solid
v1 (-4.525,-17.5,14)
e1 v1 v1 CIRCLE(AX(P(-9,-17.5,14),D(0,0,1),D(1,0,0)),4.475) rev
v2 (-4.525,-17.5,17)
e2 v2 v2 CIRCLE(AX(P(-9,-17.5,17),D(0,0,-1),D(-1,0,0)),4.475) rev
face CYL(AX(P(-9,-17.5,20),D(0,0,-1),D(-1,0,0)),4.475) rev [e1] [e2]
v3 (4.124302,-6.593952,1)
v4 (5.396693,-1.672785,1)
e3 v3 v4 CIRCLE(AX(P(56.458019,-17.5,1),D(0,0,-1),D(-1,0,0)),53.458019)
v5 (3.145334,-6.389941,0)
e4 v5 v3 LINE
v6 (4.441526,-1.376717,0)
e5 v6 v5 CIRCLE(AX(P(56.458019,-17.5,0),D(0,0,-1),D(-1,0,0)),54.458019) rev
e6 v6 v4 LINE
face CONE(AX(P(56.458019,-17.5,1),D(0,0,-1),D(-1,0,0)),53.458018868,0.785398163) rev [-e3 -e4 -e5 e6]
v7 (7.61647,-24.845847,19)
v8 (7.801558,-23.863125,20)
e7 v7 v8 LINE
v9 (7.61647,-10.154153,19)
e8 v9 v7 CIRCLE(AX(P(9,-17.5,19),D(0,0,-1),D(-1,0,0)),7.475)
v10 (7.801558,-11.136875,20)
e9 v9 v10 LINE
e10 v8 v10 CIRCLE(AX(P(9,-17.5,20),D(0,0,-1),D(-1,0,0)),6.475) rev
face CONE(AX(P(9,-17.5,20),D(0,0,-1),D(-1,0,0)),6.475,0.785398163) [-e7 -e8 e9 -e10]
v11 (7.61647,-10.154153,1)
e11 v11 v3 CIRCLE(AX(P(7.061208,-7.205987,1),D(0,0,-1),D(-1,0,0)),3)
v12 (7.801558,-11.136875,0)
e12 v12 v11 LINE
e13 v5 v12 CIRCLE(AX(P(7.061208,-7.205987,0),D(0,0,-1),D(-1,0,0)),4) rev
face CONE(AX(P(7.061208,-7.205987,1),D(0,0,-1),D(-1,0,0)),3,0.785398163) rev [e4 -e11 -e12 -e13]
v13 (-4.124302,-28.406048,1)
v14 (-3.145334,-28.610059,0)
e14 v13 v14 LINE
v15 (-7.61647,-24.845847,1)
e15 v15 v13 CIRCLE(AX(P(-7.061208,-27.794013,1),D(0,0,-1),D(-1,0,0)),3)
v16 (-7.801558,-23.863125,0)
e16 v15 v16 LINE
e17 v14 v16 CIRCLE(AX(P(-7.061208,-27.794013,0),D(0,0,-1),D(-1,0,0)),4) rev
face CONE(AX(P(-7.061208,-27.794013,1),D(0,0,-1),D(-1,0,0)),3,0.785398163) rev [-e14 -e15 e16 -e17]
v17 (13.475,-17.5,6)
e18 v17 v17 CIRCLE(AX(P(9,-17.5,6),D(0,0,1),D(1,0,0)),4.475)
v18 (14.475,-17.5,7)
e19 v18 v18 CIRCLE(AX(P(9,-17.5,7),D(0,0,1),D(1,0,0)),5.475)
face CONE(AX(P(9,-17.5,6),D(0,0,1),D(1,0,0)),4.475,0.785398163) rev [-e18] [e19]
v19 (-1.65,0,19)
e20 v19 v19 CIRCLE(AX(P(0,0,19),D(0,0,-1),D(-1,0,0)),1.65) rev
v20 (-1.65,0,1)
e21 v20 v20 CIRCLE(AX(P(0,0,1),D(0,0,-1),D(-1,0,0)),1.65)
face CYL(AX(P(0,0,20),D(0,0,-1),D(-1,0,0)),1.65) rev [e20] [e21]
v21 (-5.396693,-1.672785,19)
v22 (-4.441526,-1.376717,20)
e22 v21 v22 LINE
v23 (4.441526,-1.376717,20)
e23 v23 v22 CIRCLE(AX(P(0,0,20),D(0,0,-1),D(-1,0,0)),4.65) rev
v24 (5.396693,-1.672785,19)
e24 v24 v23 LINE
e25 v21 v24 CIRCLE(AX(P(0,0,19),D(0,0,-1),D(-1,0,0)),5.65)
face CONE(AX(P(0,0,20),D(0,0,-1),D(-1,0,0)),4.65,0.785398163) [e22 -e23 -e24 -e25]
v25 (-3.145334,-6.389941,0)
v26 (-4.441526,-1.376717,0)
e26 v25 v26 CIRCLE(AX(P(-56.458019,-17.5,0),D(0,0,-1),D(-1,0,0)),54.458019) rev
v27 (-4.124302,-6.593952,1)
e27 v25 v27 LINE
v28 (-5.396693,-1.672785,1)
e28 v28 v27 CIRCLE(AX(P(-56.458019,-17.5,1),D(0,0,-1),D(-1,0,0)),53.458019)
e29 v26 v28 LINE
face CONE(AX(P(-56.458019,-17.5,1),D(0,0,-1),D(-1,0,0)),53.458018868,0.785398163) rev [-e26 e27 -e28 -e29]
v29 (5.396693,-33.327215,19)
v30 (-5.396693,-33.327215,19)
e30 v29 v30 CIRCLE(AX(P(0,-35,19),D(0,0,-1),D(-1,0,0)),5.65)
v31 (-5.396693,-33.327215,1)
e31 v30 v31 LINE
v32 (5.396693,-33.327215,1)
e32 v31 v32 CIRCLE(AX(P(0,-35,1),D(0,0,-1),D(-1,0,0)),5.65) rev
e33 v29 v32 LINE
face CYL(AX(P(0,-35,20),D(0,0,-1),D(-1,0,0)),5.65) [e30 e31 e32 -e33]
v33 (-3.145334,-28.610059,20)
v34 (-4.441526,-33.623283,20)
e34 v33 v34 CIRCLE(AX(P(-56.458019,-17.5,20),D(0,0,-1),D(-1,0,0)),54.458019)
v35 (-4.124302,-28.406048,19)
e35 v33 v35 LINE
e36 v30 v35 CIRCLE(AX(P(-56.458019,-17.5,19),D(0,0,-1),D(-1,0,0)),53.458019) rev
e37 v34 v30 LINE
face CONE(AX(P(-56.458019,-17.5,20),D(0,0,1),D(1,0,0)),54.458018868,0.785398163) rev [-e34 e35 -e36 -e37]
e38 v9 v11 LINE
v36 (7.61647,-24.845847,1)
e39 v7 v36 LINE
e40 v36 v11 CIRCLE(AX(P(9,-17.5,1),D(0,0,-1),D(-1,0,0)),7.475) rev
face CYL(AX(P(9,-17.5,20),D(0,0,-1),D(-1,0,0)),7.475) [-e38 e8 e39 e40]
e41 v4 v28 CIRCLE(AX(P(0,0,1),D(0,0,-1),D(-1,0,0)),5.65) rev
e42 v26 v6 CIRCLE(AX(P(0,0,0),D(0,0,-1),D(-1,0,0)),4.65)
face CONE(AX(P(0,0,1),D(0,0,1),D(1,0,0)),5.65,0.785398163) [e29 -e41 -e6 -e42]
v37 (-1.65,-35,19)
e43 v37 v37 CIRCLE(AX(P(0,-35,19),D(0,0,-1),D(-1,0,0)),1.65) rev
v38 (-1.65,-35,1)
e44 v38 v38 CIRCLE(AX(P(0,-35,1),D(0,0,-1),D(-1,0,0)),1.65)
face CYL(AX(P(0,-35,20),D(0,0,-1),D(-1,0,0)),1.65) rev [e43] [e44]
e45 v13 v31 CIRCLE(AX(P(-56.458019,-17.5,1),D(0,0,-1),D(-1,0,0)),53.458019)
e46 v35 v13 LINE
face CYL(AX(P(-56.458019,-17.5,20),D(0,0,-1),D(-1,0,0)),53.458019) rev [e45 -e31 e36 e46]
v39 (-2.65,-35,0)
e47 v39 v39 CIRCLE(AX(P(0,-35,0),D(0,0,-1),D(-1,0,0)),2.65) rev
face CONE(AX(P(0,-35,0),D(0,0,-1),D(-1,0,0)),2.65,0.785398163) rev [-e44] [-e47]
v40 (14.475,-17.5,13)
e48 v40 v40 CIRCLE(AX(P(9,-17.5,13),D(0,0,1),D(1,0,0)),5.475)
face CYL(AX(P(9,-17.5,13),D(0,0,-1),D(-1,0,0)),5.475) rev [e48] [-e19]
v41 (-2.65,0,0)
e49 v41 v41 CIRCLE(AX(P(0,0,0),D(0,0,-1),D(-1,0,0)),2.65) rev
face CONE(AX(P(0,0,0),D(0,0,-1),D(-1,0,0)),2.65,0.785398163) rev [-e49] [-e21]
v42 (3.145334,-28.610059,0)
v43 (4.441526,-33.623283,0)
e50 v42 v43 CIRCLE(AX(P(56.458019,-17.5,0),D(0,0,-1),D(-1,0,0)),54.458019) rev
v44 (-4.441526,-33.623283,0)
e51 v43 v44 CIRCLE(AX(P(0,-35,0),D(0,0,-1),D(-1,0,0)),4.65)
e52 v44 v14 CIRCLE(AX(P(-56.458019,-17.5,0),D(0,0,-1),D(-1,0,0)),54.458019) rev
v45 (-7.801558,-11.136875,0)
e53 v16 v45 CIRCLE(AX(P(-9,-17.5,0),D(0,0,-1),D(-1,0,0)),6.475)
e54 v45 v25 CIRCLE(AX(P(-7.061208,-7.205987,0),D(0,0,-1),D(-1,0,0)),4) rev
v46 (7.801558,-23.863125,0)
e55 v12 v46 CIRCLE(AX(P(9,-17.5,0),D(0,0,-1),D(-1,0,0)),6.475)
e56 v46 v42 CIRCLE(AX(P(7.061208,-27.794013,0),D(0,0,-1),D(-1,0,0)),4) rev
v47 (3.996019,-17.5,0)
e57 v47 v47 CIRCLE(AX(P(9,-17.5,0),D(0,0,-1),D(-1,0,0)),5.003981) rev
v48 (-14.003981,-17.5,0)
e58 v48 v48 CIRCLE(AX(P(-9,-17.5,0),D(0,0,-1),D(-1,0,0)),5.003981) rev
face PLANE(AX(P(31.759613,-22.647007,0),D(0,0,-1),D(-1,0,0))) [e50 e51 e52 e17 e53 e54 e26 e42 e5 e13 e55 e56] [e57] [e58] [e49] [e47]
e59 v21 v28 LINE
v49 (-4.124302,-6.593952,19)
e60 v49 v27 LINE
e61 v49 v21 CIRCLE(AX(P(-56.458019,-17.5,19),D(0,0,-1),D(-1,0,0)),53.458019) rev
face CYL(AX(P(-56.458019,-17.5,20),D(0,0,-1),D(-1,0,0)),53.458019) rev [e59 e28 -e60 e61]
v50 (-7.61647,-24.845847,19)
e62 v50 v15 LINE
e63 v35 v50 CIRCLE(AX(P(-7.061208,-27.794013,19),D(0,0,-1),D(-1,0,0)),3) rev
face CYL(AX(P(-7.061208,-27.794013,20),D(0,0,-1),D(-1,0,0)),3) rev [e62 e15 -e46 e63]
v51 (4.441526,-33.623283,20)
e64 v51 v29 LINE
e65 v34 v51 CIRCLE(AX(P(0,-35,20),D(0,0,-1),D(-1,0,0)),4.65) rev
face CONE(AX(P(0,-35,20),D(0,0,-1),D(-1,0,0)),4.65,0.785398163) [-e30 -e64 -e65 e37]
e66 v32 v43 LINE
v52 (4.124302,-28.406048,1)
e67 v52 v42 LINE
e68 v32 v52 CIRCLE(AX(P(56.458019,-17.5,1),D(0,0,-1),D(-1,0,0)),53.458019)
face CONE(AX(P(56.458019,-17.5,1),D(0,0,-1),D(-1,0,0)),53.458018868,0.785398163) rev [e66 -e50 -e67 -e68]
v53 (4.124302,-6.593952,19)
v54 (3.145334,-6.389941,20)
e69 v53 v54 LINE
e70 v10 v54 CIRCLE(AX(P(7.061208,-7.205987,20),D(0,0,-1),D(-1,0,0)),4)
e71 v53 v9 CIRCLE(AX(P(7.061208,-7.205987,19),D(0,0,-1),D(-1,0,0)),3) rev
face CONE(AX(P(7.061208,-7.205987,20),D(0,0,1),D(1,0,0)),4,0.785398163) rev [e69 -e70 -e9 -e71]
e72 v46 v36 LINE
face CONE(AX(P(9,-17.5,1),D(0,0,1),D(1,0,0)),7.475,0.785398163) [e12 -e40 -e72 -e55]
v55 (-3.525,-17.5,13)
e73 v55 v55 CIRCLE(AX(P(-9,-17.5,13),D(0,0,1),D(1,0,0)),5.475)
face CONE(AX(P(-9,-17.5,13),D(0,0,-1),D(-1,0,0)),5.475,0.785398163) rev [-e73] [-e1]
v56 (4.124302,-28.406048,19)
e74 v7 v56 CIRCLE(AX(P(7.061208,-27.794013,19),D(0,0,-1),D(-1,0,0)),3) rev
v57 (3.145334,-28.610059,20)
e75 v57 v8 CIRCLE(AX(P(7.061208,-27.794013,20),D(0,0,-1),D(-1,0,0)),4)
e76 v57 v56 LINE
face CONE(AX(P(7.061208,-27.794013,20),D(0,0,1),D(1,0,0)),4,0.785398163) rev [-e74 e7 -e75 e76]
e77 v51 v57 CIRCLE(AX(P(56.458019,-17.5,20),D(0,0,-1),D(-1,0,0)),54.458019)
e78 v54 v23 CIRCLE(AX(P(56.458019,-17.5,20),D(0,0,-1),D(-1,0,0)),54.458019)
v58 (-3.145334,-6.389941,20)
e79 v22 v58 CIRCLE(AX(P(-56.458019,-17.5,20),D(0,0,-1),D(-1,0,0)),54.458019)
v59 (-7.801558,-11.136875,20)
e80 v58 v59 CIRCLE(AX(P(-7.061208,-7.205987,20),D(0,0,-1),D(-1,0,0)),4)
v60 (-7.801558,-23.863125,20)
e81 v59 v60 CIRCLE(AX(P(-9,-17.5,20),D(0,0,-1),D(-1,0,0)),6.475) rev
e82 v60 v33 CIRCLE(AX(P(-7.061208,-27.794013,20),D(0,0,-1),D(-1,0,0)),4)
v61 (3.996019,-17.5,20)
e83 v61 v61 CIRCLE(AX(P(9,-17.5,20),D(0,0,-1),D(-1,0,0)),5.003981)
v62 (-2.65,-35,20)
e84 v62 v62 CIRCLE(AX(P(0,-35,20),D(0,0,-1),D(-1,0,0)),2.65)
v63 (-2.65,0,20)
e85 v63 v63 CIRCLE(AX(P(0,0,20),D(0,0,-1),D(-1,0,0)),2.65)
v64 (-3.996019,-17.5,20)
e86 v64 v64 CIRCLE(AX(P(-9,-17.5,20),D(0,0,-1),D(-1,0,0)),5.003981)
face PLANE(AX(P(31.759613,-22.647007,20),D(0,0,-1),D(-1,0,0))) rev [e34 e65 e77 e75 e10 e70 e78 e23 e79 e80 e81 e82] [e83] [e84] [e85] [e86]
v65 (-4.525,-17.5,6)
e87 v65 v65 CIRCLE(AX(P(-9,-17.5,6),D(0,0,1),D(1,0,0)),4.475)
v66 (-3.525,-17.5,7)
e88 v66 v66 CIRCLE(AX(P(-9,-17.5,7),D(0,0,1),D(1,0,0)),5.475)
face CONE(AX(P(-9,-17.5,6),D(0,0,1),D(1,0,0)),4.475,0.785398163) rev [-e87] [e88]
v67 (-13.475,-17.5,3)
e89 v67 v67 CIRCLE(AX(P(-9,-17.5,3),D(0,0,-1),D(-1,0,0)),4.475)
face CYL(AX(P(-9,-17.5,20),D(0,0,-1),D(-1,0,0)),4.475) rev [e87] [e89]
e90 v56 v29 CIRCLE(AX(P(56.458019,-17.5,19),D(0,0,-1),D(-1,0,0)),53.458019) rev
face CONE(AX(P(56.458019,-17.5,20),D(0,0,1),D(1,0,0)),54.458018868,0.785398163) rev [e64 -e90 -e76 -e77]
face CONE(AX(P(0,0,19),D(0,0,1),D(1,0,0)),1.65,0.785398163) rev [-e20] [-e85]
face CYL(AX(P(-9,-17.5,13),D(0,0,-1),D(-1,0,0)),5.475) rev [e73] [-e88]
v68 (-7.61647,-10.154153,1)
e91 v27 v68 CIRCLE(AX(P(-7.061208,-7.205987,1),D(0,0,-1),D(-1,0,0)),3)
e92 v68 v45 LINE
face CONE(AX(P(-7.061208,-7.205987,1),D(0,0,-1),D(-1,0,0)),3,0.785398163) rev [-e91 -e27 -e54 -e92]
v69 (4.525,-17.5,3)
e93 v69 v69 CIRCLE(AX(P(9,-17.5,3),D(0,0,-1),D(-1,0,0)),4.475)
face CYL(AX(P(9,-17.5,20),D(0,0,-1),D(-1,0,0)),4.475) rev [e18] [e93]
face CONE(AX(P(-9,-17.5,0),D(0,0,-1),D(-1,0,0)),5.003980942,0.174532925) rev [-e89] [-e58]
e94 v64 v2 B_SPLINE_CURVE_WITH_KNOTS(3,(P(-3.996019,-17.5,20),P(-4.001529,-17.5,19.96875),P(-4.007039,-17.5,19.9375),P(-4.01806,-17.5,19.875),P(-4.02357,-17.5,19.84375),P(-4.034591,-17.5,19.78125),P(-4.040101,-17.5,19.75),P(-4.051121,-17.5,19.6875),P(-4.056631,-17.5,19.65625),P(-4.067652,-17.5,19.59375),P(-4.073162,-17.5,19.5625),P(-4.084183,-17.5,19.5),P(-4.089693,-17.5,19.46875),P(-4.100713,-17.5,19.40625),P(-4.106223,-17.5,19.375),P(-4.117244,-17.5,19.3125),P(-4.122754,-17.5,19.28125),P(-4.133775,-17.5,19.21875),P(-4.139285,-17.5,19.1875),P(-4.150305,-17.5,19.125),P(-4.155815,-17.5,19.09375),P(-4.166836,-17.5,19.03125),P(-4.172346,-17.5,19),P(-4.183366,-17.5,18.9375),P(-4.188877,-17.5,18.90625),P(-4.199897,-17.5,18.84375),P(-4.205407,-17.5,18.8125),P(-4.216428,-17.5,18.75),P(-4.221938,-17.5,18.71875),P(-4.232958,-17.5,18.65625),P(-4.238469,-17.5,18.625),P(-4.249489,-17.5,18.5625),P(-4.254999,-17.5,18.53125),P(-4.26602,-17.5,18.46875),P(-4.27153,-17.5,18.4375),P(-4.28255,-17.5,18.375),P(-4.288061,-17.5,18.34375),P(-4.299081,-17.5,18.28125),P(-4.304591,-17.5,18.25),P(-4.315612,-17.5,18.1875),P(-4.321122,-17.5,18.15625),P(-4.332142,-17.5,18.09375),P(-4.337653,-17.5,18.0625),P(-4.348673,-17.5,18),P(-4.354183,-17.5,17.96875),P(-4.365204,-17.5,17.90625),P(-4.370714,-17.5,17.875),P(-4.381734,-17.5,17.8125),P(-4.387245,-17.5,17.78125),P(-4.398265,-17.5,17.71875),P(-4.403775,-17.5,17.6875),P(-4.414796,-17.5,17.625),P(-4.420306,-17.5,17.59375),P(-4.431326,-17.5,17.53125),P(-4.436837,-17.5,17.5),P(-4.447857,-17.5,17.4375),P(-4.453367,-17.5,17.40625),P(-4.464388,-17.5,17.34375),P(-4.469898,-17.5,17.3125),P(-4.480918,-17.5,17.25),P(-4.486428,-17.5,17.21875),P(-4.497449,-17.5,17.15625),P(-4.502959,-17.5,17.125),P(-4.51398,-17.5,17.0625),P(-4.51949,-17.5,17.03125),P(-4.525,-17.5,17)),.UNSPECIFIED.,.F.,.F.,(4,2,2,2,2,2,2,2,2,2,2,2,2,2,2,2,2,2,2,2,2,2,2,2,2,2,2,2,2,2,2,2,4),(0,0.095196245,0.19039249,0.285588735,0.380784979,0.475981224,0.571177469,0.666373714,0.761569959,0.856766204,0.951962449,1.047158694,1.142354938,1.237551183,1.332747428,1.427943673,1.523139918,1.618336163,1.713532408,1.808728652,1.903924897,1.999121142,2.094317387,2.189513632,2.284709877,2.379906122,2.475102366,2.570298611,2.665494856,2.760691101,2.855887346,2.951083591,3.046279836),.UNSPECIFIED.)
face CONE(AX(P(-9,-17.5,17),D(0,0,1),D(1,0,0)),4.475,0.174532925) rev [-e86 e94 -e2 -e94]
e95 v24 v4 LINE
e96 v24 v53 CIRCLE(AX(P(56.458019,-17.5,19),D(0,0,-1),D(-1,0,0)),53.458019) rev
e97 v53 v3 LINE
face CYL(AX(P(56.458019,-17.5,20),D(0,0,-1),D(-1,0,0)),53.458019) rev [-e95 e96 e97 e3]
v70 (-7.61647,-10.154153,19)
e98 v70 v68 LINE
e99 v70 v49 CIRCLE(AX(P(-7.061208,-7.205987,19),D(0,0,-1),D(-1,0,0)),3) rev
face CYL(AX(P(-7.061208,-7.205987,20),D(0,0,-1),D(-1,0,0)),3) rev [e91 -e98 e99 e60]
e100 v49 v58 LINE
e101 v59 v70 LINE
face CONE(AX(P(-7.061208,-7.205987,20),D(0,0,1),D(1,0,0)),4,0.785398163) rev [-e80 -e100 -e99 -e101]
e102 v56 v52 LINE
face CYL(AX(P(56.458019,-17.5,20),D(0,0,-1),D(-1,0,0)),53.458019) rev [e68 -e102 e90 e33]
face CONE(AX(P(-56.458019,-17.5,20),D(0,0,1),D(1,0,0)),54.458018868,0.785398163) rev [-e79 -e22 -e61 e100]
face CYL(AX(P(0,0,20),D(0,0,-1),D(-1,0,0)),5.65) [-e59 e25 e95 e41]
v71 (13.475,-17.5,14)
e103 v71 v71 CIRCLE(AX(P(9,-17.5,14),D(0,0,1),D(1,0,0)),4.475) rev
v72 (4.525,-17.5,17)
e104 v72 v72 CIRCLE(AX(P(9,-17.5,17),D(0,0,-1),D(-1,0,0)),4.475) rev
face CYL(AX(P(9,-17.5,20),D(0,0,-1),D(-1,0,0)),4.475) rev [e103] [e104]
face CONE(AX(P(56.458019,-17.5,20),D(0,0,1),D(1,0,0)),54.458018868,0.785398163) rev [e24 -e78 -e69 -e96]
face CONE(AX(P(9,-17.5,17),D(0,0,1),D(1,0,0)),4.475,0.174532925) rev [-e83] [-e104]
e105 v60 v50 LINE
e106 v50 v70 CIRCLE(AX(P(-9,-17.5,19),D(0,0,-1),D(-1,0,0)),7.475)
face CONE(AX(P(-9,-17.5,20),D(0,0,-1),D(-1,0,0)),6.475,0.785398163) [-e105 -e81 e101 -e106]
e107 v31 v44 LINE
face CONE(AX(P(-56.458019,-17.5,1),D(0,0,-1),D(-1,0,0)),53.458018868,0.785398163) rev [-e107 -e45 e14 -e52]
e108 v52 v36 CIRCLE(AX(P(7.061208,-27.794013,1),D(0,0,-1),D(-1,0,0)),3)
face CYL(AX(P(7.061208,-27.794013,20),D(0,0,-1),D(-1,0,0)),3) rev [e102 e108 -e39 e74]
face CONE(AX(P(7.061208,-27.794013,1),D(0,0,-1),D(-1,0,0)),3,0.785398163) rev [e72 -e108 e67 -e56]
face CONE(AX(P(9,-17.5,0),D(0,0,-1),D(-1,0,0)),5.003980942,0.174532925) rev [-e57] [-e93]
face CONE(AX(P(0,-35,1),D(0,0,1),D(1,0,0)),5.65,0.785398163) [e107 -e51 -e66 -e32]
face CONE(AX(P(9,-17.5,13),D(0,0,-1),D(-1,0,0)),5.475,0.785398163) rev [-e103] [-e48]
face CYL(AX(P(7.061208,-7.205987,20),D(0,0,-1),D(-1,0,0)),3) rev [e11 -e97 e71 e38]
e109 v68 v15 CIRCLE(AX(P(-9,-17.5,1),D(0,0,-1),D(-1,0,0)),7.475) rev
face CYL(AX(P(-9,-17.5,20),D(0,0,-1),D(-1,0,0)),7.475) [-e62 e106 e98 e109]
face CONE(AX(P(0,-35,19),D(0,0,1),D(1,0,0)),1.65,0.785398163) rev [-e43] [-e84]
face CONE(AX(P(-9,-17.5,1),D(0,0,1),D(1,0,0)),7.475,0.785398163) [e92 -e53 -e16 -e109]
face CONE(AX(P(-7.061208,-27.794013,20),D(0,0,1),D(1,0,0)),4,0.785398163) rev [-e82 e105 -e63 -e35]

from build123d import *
from OCP.BRepFilletAPI import BRepFilletAPI_MakeChamfer

# Parameters (mm, degrees)
SKETCH1_R               = 1.65
SKETCH1_R_2             = 4.475
BOSS_EXTRUDE1_DEPTH     = 20
CHAMFER1_SIZE           = 1
CHAMFER2_SIZE           = 3
CHAMFER2_SIZE2          = 0.528980942
CUT_EXTRUDE1_DEPTH      = 3
CUT_EXTRUDE1_DEPTH_BACK = 3
SKETCH5_R               = 5.475
CHAMFER3_SIZE           = 1


with BuildPart() as part:
    # Sketch1 → Boss-Extrude1 (new body)
    with BuildSketch(Plane.XY):
        with BuildLine():
            ThreePointArc((5.396692576, -1.672784876), (0, 5.65), (-5.396692576, -1.672784876))
            ThreePointArc((-5.396692576, -1.672784876), (-4.701973782, -4.118237099), (-4.124302136, -6.593952399))
            ThreePointArc((-4.124302136, -6.593952399), (-4.919523181, -9.306745557), (-7.616470373, -10.154152821))
            ThreePointArc((-7.616470373, -10.154152821), (-16.475, -17.5), (-7.616470373, -24.845847179))
            ThreePointArc((-7.616470373, -24.845847179), (-4.919523181, -25.693254443), (-4.124302136, -28.406047601))
            ThreePointArc((-4.124302136, -28.406047601), (-4.701973782, -30.881762901), (-5.396692576, -33.327215124))
            ThreePointArc((-5.396692576, -33.327215124), (0, -40.65), (5.396692576, -33.327215124))
            ThreePointArc((5.396692576, -33.327215124), (4.701973782, -30.881762901), (4.124302136, -28.406047601))
            ThreePointArc((4.124302136, -28.406047601), (4.919523181, -25.693254443), (7.616470373, -24.845847179))
            ThreePointArc((7.616470373, -24.845847179), (16.475, -17.5), (7.616470373, -10.154152821))
            ThreePointArc((7.616470373, -10.154152821), (4.919523181, -9.306745557), (4.124302136, -6.593952399))
            ThreePointArc((4.124302136, -6.593952399), (4.701973782, -4.118237099), (5.396692576, -1.672784876))
        make_face()
        Circle(SKETCH1_R, mode=Mode.SUBTRACT)
        with Locations((0, -35)):
            Circle(SKETCH1_R, mode=Mode.SUBTRACT)
        with Locations((9, -17.5)):
            Circle(SKETCH1_R_2, mode=Mode.SUBTRACT)
        with Locations((-9, -17.5)):
            Circle(SKETCH1_R_2, mode=Mode.SUBTRACT)
    extrude(amount=BOSS_EXTRUDE1_DEPTH)

    # Chamfer1
    chamfer1_edges = [part.edges().sort_by_distance(p)[0] for p in [
        (0, -40.65, 0),
        (-4.701973782, -30.881762901, 0),
        (16.475, -17.5, 20),
        (-4.919523181, -25.693254443, 0),
        (-16.475, -17.5, 0),
        (-4.919523181, -9.306745557, 0),
        (-4.701973782, -4.118237099, 0),
        (0, 5.65, 0),
        (4.701973782, -4.118237099, 0),
        (4.919523181, -9.306745557, 0),
        (16.475, -17.5, 0),
        (4.919523181, -25.693254443, 0),
        (4.701973782, -30.881762901, 0),
        (4.919523181, -9.306745557, 20),
        (4.701973782, -4.118237099, 20),
        (0, 5.65, 20),
        (-4.701973782, -4.118237099, 20),
        (-1.65, 0, 0),
        (-1.65, 0, 20),
        (-4.919523181, -9.306745557, 20),
        (-1.65, -35, 0),
        (-1.65, -35, 20),
        (-16.475, -17.5, 20),
        (-4.919523181, -25.693254443, 20),
        (-4.701973782, -30.881762901, 20),
        (0, -40.65, 20),
        (4.701973782, -30.881762901, 20),
        (4.919523181, -25.693254443, 20),
    ]]
    chamfer(chamfer1_edges, length=CHAMFER1_SIZE)

    # Chamfer2: one chamfer whose edges measure the first distance from different faces: ONE call of the kernel's chamfer builder (chamfer() names one face for all edges)
    chamfer2_edges_1 = [part.edges().sort_by_distance(p)[0] for p in [
        (4.525, -17.5, 0),
        (4.525, -17.5, 20),
    ]]
    chamfer2_side_1 = [part.faces().sort_by_distance(p)[0] for p in [
        (4.525, -17.5, 10),
    ]]
    chamfer2_edges_2 = [part.edges().sort_by_distance(p)[0] for p in [
        (-13.475, -17.5, 0),
        (-13.475, -17.5, 20),
    ]]
    chamfer2_side_2 = [part.faces().sort_by_distance(p)[0] for p in [
        (-13.475, -17.5, 10),
    ]]
    chamfer2 = BRepFilletAPI_MakeChamfer(part.part.solid().wrapped)
    for e in chamfer2_edges_1:
        chamfer2.Add(CHAMFER2_SIZE, CHAMFER2_SIZE2, e.wrapped, chamfer2_side_1[0].wrapped)  # the first distance lies on this face
    for e in chamfer2_edges_2:
        chamfer2.Add(CHAMFER2_SIZE, CHAMFER2_SIZE2, e.wrapped, chamfer2_side_2[0].wrapped)  # the first distance lies on this face
    add(Compound.cast(chamfer2.Shape()), mode=Mode.REPLACE)

    # Sketch5 → Cut-Extrude1 (cut, two sides: drawn at the far end of the back side and taken through both)
    with BuildSketch(Plane.XY.offset(10).offset(-CUT_EXTRUDE1_DEPTH_BACK)):
        with Locations((-9, -17.5)):
            Circle(SKETCH5_R)
        with Locations((9, -17.5)):
            Circle(SKETCH5_R)
    extrude(amount=CUT_EXTRUDE1_DEPTH + CUT_EXTRUDE1_DEPTH_BACK, mode=Mode.SUBTRACT)

    # Chamfer3
    chamfer3_edges = [part.edges().sort_by_distance(p)[0] for p in [
        (-13.475, -17.5, 13),
        (-13.475, -17.5, 7),
        (4.525, -17.5, 13),
        (4.525, -17.5, 7),
    ]]
    chamfer(chamfer3_edges, length=CHAMFER3_SIZE - 0.0001)  # a hair under: the kernel refuses the full size


solid = part.part
